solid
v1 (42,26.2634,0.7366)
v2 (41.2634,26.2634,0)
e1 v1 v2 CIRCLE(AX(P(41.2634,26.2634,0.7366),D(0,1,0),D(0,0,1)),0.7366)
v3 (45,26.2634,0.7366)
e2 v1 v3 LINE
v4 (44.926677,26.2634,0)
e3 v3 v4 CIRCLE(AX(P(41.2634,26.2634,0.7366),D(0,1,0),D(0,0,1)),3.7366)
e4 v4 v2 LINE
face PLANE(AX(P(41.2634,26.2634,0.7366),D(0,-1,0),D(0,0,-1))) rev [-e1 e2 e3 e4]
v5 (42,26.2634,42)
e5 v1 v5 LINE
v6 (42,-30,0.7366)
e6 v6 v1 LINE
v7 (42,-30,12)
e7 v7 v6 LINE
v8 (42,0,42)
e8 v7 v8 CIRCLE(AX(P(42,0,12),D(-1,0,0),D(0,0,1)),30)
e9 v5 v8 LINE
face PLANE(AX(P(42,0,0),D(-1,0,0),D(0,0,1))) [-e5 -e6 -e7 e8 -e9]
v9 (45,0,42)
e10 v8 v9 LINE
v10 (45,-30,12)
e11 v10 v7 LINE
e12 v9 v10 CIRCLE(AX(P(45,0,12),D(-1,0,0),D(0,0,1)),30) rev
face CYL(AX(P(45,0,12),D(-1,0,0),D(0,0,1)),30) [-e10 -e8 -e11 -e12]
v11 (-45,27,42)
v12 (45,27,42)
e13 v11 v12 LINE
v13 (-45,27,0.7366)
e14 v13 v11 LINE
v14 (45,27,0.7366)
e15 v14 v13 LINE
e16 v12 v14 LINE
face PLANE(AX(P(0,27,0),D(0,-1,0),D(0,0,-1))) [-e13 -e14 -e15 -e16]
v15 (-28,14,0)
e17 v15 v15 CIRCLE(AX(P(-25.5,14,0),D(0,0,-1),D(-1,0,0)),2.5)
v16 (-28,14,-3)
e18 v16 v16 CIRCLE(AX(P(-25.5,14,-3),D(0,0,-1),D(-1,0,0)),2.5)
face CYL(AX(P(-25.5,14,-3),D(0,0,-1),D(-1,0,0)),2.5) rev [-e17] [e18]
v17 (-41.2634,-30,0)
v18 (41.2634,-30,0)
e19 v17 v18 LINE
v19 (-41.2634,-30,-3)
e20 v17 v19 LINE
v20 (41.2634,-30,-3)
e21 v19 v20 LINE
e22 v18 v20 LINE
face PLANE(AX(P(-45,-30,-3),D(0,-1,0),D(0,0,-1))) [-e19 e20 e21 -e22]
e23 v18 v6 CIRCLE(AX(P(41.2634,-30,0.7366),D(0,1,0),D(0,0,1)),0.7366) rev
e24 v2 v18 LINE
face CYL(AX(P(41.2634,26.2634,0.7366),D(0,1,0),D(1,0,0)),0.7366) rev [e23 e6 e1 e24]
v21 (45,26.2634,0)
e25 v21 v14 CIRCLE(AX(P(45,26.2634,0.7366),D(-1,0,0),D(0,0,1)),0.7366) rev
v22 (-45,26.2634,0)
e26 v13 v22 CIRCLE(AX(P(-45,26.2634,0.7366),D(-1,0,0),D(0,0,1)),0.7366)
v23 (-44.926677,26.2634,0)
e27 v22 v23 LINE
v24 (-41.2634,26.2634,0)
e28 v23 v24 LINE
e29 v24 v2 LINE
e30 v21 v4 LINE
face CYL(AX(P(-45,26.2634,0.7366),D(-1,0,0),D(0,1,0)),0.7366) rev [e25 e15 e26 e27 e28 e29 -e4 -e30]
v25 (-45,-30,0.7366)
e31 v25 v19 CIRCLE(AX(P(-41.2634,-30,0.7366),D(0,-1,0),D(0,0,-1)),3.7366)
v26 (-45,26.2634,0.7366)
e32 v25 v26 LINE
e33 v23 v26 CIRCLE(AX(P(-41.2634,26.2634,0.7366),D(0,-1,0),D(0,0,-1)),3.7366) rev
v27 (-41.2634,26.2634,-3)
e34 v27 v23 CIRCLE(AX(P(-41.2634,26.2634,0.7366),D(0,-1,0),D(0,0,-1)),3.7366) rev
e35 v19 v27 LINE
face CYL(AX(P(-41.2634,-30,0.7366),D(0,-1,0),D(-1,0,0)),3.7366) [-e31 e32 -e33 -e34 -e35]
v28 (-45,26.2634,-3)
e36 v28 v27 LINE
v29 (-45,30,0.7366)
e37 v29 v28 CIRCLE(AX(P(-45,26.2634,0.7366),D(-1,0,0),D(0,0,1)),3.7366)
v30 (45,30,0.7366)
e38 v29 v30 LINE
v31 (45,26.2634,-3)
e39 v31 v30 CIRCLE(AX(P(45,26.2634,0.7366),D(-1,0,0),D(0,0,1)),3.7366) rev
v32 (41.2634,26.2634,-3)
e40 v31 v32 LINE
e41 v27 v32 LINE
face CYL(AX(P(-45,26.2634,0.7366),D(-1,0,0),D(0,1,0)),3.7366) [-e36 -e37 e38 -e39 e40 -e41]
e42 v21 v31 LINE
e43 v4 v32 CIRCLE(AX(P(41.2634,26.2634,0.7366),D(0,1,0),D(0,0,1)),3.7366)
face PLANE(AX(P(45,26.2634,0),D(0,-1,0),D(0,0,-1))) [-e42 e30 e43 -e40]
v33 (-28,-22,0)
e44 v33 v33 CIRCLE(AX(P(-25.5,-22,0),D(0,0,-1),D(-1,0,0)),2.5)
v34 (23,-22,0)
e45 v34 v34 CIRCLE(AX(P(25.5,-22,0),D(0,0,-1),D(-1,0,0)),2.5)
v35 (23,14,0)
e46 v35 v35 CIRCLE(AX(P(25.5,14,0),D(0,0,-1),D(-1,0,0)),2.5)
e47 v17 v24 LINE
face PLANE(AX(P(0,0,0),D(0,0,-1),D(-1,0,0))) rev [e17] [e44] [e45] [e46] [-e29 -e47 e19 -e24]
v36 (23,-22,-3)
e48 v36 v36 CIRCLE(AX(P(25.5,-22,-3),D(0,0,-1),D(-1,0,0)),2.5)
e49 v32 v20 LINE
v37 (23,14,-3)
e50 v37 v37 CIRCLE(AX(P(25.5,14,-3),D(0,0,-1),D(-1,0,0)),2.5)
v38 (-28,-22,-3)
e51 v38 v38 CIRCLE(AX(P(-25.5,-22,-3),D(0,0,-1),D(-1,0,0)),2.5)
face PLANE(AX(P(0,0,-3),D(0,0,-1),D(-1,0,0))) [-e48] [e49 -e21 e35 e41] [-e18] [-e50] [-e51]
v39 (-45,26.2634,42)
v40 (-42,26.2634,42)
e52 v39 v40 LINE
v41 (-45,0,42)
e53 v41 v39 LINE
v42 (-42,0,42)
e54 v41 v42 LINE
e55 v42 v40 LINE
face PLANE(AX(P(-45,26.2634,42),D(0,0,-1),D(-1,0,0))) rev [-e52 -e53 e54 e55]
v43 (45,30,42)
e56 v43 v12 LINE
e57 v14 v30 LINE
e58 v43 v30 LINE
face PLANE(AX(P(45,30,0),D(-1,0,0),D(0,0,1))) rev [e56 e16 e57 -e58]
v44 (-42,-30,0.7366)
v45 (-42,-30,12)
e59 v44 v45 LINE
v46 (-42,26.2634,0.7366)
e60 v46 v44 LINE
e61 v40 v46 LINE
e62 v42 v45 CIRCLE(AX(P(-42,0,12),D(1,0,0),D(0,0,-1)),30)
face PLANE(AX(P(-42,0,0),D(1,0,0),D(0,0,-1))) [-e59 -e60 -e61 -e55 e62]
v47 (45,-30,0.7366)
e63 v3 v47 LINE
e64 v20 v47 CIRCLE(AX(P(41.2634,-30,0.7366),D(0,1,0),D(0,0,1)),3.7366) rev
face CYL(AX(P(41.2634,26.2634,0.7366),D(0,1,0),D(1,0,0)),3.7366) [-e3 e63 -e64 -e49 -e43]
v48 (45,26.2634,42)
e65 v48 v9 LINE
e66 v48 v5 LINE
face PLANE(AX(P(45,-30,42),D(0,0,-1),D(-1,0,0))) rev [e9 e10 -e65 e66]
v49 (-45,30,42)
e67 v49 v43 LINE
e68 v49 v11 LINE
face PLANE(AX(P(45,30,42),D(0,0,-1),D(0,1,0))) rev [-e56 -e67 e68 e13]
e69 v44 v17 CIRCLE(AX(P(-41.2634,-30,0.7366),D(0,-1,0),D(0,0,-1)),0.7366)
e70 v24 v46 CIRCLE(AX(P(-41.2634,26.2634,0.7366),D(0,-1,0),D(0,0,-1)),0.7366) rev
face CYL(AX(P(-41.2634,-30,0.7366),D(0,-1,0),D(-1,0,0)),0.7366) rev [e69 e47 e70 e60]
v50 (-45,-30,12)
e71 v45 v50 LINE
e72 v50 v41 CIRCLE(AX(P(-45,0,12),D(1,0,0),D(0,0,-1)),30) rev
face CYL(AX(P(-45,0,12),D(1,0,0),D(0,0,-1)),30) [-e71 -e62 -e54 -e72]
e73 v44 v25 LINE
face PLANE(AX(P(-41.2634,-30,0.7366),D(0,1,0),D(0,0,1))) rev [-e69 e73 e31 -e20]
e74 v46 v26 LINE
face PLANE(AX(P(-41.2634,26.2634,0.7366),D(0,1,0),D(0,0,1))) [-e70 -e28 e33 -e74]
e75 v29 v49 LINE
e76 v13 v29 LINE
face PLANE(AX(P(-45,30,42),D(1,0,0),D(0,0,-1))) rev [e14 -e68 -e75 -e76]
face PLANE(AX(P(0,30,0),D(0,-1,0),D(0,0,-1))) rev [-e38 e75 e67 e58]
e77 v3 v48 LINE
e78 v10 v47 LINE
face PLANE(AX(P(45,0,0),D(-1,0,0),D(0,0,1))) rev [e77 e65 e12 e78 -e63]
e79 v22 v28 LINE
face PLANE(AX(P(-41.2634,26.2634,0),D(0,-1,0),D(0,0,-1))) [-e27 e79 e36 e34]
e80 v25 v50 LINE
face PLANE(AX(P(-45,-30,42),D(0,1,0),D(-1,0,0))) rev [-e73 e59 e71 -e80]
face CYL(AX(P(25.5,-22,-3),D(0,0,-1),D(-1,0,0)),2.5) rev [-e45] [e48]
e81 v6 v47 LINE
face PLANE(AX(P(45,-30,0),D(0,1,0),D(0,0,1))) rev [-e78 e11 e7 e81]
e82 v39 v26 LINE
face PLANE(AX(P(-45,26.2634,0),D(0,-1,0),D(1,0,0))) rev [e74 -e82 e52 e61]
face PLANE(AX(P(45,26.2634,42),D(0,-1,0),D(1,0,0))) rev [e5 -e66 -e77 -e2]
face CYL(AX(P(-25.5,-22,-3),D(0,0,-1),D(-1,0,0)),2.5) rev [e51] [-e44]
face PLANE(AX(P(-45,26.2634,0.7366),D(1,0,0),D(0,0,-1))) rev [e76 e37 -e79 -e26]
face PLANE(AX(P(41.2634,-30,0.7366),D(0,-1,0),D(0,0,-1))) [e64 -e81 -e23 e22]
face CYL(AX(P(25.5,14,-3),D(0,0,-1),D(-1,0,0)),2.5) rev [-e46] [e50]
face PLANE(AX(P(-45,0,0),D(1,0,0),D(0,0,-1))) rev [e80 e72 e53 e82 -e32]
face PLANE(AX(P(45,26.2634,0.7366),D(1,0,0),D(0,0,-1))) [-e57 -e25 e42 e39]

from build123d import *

# Parameters (mm, degrees)
SKETCH_2_W                         = 90
SKETCH_2_H                         = 60
SM_BASE_FLANGE_1_DEPTH             = 3
SM_EDGE_FLANGE_1_STRIP_W           = 13.4732
SM_EDGE_FLANGE_1_STRIP_H           = 3
SM_EDGE_FLANGE_1_STRIP_CUT_DEPTH   = 90
SM_EDGE_FLANGE_1_DEPTH             = 90
SM_EDGE_FLANGE_2_STRIP_W           = 13.4732
SM_EDGE_FLANGE_2_STRIP_H           = 3
SM_EDGE_FLANGE_2_STRIP_CUT_DEPTH   = 56.2634
SM_EDGE_FLANGE_2_STRIP_2_W         = 13.4732
SM_EDGE_FLANGE_2_STRIP_2_H         = 3
SM_EDGE_FLANGE_2_STRIP_CUT_2_DEPTH = 56.2634
SM_EDGE_FLANGE_2_DEPTH             = 56.2634
SM_EDGE_FLANGE_2_BEND_DEPTH        = 56.2634
HOLE_WIZARD_M6_1_D                 = 5
FILLET_1_R                         = 30


# Sheet-metal steps are written as plain solids
with BuildPart() as part:
    # Sketch 2 → 基体-法兰1 (new body)
    with BuildSketch(Plane.XY):
        Rectangle(SKETCH_2_W, SKETCH_2_H)
    extrude(amount=-SM_BASE_FLANGE_1_DEPTH)

    # 边线-法兰1 strip (across the edge) → 边线-法兰1 strip cut (cut)
    with BuildSketch(Plane(origin=(45, 30, 0), x_dir=(0, -1, 0), z_dir=(-1, 0, 0))):
        with Locations((-3, -1.5)):
            Rectangle(SM_EDGE_FLANGE_1_STRIP_W, SM_EDGE_FLANGE_1_STRIP_H)
    extrude(amount=SM_EDGE_FLANGE_1_STRIP_CUT_DEPTH, mode=Mode.SUBTRACT)

    # 边线-法兰1 section (across the edge) → 边线-法兰1 (add)
    with BuildSketch(Plane(origin=(45, 30, 0), x_dir=(0, -1, 0), z_dir=(-1, 0, 0))):
        with BuildLine():
            Line((0, 0.7366), (0, 42))
            Line((0, 42), (3, 42))
            Line((3, 42), (3, 0.7366))
            ThreePointArc((3, 0.7366), (3.215745145, 0.215745145), (3.7366, 0))
            Line((3.7366, 0), (3.7366, -3))
            ThreePointArc((3.7366, -3), (1.094424801, -1.905575199), (0, 0.7366))
        make_face()
    extrude(amount=SM_EDGE_FLANGE_1_DEPTH)

    # 边线-法兰2 strip (across the edge) → 边线-法兰2 strip cut (cut)
    with BuildSketch(Plane(origin=(-45, 26.2634, 0), x_dir=(1, 0, 0), z_dir=(0, -1, 0))):
        with Locations((-3, -1.5)):
            Rectangle(SM_EDGE_FLANGE_2_STRIP_W, SM_EDGE_FLANGE_2_STRIP_H)
    extrude(amount=SM_EDGE_FLANGE_2_STRIP_CUT_DEPTH, mode=Mode.SUBTRACT)

    # 边线-法兰2 strip 2 (across the edge) → 边线-法兰2 strip cut 2 (cut)
    with BuildSketch(Plane(origin=(45, -30, 0), x_dir=(-1, 0, 0), z_dir=(0, 1, 0))):
        with Locations((-3, -1.5)):
            Rectangle(SM_EDGE_FLANGE_2_STRIP_2_W, SM_EDGE_FLANGE_2_STRIP_2_H)
    extrude(amount=SM_EDGE_FLANGE_2_STRIP_CUT_2_DEPTH, mode=Mode.SUBTRACT)

    # 边线-法兰2 section (across the edge) → 边线-法兰2 (add)
    with BuildSketch(Plane(origin=(-45, 26.2634, 0), x_dir=(1, 0, 0), z_dir=(0, -1, 0))):
        with BuildLine():
            Line((0, 0.7366), (0, 42))
            Line((0, 42), (3, 42))
            Line((3, 42), (3, 0.7366))
            ThreePointArc((3, 0.7366), (3.215745145, 0.215745145), (3.7366, 0))
            Line((3.7366, 0), (3.7366, -3))
            ThreePointArc((3.7366, -3), (1.094424801, -1.905575199), (0, 0.7366))
        make_face()
    extrude(amount=SM_EDGE_FLANGE_2_DEPTH)

    # 边线-法兰2 section 2 (across the edge) → 边线-法兰2 bend (add)
    with BuildSketch(Plane(origin=(45, -30, 0), x_dir=(-1, 0, 0), z_dir=(0, 1, 0))):
        with BuildLine():
            Line((0, 0.7366), (0, 42))
            Line((0, 42), (3, 42))
            Line((3, 42), (3, 0.7366))
            ThreePointArc((3, 0.7366), (3.215745145, 0.215745145), (3.7366, 0))
            Line((3.7366, 0), (3.7366, -3))
            ThreePointArc((3.7366, -3), (1.094424801, -1.905575199), (0, 0.7366))
        make_face()
    extrude(amount=SM_EDGE_FLANGE_2_BEND_DEPTH)

    # M6 螺纹孔1 (through all)
    with Locations(Plane(origin=(0, 0, -3), x_dir=(-1, 0, 0), z_dir=(0, 0, -1))):
        with Locations((-25.5, 14), (-25.5, -22), (25.5, -22), (25.5, 14)):
            Hole(HOLE_WIZARD_M6_1_D / 2)

    # 圆角1
    fillet_1_edges = [part.edges().sort_by_distance(p)[0] for p in [
        (43.5, -30, 42),
        (-43.5, -30, 42),
    ]]
    fillet(fillet_1_edges, radius=FILLET_1_R)


solid = part.part
